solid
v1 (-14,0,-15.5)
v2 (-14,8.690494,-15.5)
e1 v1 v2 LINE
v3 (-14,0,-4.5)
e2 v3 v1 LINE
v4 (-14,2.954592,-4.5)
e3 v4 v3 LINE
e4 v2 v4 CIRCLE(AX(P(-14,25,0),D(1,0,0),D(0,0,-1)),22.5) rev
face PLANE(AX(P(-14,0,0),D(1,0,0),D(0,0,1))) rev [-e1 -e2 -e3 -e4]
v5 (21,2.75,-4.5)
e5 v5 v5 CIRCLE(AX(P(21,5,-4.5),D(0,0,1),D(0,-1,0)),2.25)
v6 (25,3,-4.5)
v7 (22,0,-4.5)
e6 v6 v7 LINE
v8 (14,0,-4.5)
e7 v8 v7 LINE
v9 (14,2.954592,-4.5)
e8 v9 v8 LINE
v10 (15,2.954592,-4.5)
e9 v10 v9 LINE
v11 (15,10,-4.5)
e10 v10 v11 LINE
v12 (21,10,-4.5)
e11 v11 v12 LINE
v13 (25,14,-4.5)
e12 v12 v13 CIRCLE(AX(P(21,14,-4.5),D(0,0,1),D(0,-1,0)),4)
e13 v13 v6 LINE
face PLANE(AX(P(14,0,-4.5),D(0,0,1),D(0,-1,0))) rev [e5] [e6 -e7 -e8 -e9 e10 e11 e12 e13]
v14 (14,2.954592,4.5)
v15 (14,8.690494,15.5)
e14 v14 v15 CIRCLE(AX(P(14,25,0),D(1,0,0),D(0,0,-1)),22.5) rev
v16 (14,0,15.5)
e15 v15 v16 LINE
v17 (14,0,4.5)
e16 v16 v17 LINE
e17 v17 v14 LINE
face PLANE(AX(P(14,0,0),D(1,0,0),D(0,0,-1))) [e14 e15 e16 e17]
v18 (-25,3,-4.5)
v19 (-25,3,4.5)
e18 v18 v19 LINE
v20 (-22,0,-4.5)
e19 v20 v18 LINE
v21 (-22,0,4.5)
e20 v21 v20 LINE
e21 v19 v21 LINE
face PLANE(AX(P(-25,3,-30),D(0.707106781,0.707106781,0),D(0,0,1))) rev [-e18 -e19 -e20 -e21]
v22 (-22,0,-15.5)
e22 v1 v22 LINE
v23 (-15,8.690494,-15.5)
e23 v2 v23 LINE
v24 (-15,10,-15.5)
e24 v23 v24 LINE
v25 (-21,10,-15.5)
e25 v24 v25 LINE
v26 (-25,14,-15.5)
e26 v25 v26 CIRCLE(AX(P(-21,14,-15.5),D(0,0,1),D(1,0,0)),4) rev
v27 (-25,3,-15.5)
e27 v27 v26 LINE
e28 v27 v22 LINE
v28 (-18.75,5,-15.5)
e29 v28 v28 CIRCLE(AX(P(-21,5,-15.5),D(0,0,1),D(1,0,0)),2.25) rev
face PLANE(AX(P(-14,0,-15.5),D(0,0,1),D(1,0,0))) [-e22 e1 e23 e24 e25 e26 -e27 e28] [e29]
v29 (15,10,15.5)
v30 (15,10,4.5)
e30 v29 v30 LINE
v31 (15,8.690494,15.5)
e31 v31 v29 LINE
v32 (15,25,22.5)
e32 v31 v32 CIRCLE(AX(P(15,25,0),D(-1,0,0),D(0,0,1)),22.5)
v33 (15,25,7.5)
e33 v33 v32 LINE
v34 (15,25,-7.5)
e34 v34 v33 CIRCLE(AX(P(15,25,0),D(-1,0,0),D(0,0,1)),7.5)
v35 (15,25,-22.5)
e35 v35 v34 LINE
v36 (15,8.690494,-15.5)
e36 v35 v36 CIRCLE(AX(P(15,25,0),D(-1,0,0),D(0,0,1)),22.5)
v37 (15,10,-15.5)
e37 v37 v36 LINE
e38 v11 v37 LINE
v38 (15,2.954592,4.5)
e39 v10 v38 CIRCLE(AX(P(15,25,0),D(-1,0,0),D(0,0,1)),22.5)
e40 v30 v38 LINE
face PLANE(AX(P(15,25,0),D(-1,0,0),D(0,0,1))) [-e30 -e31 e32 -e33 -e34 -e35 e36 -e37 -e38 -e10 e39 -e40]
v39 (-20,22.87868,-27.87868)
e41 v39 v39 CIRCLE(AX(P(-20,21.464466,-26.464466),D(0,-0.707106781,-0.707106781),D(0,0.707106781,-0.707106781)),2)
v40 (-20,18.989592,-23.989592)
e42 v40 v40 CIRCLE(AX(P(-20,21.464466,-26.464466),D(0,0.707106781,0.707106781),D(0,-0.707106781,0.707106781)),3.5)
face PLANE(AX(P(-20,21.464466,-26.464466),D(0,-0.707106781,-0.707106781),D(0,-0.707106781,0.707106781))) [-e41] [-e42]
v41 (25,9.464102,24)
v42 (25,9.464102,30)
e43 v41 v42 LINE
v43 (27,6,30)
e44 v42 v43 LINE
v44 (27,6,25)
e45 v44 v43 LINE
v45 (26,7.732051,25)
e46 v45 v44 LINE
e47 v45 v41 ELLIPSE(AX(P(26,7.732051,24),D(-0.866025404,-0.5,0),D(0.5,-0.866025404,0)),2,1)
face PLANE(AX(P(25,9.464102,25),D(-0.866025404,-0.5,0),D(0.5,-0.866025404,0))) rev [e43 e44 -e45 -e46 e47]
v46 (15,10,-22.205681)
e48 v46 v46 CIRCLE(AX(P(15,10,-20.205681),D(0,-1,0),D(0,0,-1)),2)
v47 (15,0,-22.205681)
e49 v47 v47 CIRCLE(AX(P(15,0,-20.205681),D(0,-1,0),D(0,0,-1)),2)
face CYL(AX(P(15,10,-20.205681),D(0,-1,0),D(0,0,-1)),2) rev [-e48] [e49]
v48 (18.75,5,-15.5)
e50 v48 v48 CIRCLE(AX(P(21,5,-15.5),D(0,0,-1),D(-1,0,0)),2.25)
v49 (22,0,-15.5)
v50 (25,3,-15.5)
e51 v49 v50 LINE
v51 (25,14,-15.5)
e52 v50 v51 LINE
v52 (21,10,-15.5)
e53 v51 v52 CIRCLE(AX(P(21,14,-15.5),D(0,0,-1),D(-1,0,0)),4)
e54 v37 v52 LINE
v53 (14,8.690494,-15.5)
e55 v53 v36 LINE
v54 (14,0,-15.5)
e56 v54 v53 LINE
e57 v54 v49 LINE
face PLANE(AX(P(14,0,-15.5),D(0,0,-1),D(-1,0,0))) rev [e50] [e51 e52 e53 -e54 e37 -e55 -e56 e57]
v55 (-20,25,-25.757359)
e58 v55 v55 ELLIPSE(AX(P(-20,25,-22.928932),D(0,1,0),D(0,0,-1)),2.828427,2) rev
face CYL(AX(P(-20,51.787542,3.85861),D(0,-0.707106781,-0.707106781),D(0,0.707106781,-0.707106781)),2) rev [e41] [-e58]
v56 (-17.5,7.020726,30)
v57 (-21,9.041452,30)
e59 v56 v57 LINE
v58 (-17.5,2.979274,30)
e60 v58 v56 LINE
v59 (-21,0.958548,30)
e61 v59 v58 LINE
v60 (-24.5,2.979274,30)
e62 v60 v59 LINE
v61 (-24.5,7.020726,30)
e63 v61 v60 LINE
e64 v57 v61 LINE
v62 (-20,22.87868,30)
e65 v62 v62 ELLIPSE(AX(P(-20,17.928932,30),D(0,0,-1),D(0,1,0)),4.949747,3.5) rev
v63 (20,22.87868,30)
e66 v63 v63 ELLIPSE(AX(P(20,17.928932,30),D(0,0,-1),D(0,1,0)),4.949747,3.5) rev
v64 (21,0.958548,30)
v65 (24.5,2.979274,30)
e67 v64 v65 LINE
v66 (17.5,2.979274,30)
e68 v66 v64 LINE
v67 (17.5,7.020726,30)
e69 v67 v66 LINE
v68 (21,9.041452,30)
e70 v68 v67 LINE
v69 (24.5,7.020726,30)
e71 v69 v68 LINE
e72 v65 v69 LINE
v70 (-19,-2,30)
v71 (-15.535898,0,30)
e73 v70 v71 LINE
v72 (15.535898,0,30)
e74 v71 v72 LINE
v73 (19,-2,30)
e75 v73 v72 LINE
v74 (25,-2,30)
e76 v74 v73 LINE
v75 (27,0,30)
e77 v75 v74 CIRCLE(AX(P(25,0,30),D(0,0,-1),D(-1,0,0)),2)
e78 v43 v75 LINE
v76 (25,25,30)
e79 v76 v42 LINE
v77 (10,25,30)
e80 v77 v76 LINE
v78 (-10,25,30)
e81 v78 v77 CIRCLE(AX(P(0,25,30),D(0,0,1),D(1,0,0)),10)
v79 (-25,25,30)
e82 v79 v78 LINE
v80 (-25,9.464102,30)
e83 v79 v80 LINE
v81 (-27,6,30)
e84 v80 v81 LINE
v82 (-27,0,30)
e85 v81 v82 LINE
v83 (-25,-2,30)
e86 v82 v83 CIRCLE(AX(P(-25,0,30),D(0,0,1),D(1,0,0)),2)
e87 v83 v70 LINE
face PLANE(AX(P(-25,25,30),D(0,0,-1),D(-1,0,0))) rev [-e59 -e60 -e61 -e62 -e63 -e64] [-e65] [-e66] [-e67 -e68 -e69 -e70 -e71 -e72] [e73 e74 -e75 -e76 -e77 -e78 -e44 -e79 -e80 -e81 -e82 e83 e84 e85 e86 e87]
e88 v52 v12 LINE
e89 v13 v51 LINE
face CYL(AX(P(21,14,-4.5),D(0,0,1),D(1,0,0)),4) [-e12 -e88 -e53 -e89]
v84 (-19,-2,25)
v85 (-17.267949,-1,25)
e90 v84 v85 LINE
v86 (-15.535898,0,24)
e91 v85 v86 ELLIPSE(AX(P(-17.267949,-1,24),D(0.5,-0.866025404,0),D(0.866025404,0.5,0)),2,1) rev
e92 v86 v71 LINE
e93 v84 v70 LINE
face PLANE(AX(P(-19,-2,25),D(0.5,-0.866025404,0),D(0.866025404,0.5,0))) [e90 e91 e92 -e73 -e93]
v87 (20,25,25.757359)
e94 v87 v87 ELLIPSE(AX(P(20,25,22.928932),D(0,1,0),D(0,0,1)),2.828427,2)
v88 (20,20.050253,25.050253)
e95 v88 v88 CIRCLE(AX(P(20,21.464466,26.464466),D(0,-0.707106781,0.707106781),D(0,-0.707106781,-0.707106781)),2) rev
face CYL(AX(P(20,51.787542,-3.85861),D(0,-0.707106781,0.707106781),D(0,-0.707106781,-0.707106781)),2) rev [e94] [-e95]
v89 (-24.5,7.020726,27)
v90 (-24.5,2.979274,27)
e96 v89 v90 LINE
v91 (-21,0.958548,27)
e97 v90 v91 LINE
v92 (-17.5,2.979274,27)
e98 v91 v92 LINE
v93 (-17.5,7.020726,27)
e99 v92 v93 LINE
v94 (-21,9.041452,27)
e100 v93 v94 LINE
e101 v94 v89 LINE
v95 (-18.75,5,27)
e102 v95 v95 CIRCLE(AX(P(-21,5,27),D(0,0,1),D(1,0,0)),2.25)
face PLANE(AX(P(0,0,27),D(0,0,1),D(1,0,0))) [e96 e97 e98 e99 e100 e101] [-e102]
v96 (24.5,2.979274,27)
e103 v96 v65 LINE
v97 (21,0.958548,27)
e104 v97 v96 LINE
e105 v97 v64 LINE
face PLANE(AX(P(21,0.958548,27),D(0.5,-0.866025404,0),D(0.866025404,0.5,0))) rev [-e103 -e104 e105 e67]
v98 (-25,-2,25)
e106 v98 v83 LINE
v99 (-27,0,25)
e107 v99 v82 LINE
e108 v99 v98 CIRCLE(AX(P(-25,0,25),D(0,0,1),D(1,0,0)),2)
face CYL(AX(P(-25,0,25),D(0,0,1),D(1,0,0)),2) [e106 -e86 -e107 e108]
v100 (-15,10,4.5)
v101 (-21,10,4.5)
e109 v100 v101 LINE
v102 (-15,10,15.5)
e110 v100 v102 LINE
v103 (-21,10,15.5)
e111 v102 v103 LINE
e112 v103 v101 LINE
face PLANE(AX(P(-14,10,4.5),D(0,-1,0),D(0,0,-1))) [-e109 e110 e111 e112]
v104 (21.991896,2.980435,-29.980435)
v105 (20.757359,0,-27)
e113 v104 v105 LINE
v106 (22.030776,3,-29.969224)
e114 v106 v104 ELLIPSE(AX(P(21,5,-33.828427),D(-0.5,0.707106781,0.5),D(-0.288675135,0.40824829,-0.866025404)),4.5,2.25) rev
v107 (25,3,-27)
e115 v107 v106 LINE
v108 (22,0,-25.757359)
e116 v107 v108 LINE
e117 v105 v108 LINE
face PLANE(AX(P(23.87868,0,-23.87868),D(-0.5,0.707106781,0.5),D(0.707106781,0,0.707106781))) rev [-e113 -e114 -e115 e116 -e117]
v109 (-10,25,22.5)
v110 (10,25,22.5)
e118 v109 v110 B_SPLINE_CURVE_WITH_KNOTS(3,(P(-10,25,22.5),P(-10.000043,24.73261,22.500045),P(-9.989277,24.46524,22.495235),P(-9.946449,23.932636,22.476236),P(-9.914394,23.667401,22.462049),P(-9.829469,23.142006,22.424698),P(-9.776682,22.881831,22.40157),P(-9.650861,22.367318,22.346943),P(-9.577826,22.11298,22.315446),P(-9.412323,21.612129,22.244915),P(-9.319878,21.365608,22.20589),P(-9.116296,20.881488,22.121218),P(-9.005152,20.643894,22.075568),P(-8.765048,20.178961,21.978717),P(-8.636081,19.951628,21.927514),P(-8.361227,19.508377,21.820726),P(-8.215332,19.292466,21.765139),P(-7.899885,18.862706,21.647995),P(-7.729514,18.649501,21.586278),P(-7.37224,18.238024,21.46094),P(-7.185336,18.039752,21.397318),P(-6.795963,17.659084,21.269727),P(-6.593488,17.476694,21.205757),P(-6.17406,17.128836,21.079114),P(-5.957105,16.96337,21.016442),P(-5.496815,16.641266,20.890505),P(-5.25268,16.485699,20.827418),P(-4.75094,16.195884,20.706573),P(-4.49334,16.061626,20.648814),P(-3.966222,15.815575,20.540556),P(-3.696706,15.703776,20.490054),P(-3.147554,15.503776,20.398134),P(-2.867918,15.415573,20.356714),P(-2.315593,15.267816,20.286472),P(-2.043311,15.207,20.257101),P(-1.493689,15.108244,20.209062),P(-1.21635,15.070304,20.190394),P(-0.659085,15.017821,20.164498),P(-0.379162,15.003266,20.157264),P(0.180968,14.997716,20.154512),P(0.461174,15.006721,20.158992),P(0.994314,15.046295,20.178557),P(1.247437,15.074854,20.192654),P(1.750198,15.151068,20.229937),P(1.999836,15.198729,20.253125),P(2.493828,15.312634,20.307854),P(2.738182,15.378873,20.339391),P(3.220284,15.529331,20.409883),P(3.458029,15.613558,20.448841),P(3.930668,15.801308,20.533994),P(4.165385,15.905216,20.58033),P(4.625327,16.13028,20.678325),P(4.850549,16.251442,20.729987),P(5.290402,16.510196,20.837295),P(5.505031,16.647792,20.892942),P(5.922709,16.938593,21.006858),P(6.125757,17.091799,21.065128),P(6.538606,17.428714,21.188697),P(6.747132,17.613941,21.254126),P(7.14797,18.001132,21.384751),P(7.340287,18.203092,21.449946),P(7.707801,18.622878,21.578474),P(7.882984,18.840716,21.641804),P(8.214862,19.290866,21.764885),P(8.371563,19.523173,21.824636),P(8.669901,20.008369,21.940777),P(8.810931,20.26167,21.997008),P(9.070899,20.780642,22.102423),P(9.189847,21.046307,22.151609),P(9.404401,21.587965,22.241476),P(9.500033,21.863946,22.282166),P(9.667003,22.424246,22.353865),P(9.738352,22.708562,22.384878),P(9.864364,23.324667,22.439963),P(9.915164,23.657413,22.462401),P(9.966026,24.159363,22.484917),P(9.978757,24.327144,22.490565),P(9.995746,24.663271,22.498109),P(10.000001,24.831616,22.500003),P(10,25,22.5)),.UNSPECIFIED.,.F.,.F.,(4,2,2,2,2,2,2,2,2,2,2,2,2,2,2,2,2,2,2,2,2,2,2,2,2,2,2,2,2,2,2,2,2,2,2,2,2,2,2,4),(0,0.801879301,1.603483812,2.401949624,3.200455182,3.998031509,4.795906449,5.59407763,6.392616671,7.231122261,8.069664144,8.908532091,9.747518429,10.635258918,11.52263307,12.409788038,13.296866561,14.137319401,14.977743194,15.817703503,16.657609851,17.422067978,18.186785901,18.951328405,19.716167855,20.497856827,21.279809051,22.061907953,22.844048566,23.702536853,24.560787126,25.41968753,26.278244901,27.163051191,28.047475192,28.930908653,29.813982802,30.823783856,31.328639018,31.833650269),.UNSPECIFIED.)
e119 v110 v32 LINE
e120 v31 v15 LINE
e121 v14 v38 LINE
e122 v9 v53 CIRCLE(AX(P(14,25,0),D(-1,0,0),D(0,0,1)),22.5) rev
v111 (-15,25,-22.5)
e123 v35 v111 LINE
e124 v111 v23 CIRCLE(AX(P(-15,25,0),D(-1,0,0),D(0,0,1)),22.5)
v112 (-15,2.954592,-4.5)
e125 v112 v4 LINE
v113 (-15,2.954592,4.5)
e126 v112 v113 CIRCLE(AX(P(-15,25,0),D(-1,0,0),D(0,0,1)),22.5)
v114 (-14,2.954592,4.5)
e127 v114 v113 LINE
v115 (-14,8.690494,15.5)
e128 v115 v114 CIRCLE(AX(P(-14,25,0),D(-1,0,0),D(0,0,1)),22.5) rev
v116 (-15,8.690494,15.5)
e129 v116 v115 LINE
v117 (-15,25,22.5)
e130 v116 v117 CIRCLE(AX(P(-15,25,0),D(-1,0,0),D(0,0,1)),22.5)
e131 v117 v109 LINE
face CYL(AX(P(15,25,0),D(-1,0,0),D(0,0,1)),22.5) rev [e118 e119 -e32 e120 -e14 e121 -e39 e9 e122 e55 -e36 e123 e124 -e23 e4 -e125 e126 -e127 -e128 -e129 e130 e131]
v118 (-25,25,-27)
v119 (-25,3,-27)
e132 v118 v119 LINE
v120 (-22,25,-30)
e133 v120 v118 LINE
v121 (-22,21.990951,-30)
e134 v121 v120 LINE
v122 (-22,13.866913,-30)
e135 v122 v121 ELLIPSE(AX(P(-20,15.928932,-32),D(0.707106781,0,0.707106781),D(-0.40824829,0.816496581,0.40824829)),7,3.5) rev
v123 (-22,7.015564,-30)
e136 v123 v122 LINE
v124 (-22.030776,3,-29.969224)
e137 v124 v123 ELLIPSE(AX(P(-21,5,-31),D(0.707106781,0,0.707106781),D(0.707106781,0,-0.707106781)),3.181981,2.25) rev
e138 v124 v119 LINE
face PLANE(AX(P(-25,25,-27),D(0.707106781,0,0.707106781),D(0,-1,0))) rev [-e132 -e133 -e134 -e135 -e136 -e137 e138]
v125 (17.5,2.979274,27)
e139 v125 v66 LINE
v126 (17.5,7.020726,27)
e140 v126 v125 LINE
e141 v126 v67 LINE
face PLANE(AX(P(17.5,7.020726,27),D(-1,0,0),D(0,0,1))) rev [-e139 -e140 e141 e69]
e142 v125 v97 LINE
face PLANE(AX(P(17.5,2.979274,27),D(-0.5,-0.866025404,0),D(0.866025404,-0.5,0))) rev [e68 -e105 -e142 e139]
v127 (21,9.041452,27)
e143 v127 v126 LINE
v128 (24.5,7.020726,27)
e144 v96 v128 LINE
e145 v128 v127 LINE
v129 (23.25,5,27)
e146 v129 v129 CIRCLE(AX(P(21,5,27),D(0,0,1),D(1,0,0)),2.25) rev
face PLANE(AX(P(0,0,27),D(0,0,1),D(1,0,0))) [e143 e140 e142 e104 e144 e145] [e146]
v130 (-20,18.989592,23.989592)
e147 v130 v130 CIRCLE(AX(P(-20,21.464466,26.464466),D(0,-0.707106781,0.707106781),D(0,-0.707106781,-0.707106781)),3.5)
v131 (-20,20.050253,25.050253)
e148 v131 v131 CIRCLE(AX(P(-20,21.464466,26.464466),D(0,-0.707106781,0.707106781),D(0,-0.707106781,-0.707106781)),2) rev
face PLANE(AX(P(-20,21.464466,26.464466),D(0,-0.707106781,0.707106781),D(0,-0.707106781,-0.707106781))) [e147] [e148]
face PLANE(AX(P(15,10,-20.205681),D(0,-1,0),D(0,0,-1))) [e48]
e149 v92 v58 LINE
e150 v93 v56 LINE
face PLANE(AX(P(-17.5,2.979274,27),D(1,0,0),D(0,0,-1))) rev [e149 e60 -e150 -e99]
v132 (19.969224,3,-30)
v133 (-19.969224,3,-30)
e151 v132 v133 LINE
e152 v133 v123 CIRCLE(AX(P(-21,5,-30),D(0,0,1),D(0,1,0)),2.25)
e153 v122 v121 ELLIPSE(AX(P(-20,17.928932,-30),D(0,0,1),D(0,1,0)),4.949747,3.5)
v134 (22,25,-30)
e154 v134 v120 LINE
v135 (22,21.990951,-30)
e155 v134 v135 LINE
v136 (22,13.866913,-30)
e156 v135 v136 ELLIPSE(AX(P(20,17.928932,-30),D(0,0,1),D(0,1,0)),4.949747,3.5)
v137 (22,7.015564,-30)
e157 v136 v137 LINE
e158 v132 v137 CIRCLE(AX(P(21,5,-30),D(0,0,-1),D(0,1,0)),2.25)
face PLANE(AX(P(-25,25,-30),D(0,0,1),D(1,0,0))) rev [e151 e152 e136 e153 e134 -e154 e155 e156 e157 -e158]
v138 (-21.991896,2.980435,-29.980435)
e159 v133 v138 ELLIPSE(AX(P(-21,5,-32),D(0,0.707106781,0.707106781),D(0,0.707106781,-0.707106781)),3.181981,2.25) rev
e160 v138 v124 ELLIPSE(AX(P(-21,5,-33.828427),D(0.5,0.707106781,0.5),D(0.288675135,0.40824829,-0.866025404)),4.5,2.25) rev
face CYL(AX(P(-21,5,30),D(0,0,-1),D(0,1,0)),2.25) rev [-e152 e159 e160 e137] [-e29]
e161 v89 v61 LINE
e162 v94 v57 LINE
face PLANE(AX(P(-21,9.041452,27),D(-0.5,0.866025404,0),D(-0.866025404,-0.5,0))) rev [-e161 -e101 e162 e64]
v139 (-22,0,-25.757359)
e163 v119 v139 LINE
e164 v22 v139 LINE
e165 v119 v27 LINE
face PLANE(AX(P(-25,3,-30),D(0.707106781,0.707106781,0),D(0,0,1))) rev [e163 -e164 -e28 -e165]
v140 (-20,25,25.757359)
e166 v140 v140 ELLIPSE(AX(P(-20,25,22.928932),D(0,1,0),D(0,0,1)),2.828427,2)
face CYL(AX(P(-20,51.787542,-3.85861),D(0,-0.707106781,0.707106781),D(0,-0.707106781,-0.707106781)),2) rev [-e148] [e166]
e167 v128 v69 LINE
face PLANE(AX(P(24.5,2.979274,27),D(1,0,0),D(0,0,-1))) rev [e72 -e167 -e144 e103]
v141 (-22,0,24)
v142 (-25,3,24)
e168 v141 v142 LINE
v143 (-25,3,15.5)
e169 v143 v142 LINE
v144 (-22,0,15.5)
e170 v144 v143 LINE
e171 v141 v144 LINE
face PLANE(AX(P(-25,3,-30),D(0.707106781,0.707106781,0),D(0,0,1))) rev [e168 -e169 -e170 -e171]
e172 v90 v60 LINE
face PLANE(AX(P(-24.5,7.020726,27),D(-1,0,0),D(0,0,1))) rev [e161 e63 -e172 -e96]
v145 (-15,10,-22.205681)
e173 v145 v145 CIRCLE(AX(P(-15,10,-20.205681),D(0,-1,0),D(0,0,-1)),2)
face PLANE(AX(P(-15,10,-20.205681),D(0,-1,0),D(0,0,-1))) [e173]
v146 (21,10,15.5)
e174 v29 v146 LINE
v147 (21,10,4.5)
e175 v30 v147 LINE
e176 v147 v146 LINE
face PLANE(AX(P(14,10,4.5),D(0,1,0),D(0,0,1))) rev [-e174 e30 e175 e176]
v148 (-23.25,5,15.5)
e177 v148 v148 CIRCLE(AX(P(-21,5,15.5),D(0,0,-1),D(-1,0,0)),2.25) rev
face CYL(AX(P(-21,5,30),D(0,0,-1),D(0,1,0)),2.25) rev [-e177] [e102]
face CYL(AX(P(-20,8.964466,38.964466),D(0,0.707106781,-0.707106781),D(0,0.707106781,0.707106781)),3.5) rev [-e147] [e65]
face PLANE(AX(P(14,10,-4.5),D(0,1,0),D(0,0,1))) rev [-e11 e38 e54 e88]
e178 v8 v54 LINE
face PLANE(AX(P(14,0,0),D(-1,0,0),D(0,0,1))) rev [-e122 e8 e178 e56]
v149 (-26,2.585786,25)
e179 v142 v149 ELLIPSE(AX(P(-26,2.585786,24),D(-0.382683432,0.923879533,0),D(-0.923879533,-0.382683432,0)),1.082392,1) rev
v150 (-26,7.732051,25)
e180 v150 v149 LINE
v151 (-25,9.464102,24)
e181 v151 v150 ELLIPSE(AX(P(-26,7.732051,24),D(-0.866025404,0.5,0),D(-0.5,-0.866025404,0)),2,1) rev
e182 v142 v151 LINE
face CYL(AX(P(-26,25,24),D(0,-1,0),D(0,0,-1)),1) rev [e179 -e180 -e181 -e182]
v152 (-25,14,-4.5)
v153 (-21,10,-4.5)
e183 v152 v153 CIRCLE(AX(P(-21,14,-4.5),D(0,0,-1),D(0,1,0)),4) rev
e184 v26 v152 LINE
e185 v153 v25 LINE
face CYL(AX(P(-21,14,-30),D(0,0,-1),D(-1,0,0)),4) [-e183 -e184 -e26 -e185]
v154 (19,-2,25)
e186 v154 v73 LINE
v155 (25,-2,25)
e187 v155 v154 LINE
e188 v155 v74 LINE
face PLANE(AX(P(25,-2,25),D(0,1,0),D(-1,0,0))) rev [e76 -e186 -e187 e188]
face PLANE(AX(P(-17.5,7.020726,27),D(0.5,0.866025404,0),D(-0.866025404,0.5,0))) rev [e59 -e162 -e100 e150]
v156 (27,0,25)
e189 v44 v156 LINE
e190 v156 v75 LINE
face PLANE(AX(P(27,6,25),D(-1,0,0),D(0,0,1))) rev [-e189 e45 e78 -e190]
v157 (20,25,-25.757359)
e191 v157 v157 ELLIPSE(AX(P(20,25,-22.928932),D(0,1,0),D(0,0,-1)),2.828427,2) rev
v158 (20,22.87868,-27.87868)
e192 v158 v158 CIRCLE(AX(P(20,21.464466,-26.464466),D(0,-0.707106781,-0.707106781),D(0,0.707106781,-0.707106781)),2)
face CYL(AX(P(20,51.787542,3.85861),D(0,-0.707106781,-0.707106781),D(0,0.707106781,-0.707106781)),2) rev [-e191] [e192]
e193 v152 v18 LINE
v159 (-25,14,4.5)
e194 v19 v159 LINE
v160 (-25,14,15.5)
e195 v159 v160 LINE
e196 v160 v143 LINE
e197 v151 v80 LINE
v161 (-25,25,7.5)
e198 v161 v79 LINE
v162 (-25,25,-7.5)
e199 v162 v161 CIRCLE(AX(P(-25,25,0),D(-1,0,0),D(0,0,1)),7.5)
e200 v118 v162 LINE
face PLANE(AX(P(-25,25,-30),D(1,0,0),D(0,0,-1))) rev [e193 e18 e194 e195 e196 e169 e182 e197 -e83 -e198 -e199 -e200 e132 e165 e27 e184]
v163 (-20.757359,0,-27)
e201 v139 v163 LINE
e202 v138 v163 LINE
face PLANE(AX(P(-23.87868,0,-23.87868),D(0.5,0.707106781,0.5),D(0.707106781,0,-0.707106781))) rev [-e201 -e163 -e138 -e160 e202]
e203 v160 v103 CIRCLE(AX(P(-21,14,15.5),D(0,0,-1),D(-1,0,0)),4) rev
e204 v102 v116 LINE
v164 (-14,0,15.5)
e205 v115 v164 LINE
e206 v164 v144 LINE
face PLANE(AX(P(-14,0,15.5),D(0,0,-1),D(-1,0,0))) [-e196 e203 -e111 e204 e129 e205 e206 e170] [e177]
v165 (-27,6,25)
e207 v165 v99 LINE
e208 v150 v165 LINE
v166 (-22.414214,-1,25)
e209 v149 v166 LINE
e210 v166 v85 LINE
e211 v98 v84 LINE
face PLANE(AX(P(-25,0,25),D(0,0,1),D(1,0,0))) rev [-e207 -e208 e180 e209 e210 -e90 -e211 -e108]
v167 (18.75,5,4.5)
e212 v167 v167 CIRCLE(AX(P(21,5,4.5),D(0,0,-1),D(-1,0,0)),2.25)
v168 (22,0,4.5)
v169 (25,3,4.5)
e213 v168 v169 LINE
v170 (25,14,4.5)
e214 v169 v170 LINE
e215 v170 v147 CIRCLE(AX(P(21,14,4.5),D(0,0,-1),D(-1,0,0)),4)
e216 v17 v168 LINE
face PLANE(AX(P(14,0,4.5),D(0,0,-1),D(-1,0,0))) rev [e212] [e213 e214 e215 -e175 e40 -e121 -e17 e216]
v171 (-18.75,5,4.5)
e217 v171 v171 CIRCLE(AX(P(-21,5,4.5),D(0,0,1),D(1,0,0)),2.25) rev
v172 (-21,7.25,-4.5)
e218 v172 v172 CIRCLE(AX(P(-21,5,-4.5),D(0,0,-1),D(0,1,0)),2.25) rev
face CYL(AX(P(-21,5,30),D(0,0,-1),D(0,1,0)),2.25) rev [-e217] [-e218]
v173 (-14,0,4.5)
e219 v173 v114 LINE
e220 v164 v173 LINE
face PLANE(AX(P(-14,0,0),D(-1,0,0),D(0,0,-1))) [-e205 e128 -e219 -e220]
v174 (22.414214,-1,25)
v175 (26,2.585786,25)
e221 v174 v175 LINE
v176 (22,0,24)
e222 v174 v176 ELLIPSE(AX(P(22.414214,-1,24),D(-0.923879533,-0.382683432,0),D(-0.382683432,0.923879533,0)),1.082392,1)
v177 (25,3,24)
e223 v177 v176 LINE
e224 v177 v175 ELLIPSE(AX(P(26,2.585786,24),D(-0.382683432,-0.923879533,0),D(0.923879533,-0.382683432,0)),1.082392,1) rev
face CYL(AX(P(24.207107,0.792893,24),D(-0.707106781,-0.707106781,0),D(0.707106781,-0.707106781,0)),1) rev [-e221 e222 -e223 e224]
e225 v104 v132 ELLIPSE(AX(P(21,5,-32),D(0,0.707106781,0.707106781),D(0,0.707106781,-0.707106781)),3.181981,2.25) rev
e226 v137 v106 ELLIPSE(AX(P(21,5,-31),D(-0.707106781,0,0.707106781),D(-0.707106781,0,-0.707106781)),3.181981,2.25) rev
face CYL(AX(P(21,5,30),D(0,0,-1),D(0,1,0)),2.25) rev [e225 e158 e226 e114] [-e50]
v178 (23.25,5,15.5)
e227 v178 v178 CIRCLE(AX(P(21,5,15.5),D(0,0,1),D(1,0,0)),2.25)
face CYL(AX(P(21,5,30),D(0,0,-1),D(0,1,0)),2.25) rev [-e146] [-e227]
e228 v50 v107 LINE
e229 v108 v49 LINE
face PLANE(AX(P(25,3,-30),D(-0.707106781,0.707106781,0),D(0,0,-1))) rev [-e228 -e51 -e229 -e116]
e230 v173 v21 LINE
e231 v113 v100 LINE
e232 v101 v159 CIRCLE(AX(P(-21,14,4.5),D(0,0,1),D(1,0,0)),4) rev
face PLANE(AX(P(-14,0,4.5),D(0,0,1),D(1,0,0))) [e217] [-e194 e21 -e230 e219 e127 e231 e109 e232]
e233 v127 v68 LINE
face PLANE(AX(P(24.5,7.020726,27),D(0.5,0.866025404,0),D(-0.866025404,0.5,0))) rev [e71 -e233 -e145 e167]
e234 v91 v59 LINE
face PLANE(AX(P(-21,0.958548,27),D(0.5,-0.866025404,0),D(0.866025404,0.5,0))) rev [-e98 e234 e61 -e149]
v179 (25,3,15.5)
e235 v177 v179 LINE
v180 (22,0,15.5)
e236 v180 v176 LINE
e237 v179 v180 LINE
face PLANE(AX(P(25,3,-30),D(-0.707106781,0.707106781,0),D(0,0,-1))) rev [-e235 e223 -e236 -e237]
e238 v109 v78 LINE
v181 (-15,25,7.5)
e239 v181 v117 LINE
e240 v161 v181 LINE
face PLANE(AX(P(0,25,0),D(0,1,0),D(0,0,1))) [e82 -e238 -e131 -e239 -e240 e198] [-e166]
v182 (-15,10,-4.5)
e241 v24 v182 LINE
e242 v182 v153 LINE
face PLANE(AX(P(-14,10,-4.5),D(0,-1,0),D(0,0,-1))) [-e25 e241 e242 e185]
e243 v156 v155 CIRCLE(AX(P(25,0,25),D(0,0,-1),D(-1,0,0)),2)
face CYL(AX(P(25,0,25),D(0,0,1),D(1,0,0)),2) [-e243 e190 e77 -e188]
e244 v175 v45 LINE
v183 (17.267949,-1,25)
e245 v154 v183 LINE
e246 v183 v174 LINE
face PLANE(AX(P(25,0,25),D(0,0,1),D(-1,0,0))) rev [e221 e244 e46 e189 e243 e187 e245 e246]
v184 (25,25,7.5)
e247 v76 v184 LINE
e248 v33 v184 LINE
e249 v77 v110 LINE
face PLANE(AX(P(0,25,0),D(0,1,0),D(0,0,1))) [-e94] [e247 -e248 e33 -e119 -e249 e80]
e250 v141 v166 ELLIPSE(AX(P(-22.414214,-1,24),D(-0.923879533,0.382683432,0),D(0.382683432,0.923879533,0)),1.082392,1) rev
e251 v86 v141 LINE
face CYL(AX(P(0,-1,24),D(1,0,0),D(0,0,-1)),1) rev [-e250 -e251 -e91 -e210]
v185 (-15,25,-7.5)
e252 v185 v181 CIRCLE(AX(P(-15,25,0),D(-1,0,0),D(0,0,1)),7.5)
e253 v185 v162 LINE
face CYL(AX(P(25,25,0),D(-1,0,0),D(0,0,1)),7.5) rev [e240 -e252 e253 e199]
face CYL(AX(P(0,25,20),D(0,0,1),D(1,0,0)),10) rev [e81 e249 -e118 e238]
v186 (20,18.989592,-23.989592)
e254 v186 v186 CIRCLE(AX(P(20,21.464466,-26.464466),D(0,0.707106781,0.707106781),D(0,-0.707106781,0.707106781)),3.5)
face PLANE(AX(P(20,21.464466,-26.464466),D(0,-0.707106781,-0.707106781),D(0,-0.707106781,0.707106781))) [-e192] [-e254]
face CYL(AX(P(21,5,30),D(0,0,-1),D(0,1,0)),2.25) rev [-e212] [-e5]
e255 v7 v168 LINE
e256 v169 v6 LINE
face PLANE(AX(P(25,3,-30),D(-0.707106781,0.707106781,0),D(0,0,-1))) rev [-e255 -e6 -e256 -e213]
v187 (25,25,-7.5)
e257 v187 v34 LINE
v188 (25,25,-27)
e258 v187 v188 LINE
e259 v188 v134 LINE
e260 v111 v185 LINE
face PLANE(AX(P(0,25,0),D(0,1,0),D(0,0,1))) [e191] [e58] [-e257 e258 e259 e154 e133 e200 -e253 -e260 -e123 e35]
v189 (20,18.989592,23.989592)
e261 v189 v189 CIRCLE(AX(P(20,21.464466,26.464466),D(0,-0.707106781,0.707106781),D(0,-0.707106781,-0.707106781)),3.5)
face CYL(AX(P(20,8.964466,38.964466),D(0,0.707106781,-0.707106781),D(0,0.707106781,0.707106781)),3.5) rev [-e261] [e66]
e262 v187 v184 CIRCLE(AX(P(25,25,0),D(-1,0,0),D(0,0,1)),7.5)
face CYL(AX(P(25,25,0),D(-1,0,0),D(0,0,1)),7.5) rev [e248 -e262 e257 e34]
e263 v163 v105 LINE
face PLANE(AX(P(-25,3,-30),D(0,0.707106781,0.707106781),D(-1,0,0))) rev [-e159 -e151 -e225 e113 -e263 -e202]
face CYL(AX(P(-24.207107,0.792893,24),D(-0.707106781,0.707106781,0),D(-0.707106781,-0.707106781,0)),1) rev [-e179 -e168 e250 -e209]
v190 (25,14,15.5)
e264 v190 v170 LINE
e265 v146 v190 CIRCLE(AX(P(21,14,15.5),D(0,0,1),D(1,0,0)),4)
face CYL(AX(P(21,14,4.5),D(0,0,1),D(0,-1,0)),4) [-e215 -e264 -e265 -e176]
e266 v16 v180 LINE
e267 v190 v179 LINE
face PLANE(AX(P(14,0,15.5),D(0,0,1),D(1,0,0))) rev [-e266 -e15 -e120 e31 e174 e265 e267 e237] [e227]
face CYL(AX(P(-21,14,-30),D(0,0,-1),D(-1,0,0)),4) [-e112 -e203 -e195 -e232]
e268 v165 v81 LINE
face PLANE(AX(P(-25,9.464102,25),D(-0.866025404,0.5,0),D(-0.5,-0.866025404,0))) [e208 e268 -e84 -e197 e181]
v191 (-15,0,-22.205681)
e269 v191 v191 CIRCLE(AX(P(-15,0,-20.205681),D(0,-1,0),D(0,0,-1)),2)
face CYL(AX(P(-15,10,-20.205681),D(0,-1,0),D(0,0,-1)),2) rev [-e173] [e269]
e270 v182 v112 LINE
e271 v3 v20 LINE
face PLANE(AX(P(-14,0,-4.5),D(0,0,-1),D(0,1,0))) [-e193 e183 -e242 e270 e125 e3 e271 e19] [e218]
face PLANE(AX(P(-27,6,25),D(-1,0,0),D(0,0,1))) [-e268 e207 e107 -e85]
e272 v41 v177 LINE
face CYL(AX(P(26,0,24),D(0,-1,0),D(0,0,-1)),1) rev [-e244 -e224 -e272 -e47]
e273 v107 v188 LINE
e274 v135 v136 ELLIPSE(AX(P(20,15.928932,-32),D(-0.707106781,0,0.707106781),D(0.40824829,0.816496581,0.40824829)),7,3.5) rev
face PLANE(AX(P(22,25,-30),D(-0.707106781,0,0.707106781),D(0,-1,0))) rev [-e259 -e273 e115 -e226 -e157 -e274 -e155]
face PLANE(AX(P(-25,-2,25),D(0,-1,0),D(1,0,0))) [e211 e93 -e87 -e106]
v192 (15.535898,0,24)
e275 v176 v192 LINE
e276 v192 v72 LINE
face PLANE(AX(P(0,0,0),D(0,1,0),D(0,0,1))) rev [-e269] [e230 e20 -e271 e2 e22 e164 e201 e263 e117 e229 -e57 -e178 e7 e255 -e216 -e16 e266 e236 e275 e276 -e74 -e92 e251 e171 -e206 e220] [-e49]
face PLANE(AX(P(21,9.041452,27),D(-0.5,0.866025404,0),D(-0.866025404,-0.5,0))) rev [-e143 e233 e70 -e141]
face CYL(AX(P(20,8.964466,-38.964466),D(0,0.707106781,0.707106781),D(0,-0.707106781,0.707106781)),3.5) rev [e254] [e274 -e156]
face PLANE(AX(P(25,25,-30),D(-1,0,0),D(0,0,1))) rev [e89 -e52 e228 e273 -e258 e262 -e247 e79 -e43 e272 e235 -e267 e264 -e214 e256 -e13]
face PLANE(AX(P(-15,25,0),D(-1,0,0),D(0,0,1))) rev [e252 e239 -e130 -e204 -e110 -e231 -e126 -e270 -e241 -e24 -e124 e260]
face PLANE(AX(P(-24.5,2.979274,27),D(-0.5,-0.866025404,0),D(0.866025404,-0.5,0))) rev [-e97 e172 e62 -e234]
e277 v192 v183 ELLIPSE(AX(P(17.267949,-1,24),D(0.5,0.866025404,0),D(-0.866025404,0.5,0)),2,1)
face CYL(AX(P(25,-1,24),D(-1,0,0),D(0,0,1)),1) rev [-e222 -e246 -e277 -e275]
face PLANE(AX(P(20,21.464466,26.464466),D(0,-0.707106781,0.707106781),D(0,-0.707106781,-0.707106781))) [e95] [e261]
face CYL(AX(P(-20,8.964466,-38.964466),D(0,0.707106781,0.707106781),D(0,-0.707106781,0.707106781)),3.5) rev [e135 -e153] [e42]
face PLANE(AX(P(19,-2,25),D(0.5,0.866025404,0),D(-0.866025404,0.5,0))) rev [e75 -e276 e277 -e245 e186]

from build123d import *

# Parameters (mm, degrees)
SKETCH1_W           = 50
SKETCH1_H           = 60
BOSS_EXTRUDE1_DEPTH = 25
CUT_EXTRUDE1_START  = -10
SKETCH2_R           = 22.5
CUT_EXTRUDE1_DEPTH  = 30
SKETCH3_R           = 7.5
CUT_EXTRUDE2_DEPTH  = 64.442887702
SKETCH4_R           = 10
CUT_EXTRUDE3_DEPTH  = 10
SKETCH10_W          = 11
SKETCH10_H          = 10
CUT_EXTRUDE9_DEPTH  = 11
SKETCH11_R          = 2.25
CUT_EXTRUDE10_DEPTH = 50.398886748
SKETCH12_R          = 2
CUT_EXTRUDE11_DEPTH = 50.371044201
SKETCH13_R          = 3.5
CUT_EXTRUDE12_DEPTH = 50.371044201
CHAMFER1_SIZE       = 3
FILLET1_R           = 4
SKETCH14_R          = 2
CUT_EXTRUDE13_DEPTH = 10
CUT_EXTRUDE14_DEPTH = 3
BOSS_EXTRUDE2_DEPTH = 5
CHAMFER2_SIZE       = 3
FILLET2_R           = 1


with BuildPart() as part:
    # Sketch1 → Boss-Extrude1 (new body)
    with BuildSketch(Plane(origin=(0, 0, 0), x_dir=(1, 0, 0), z_dir=(0, 1, 0))):
        Rectangle(SKETCH1_W, SKETCH1_H)
    extrude(amount=BOSS_EXTRUDE1_DEPTH)

    # Sketch2 → Cut-Extrude1 (cut)
    with BuildSketch(Plane.ZY.offset(25).offset(CUT_EXTRUDE1_START)):
        with Locations((0, 25)):
            Circle(SKETCH2_R)
    extrude(amount=-CUT_EXTRUDE1_DEPTH, mode=Mode.SUBTRACT)

    # Sketch3 → Cut-Extrude2 (cut, through all)
    with BuildSketch(Plane.ZY.offset(25)):
        with Locations((0, 25)):
            Circle(SKETCH3_R)
    extrude(amount=-CUT_EXTRUDE2_DEPTH, mode=Mode.SUBTRACT)

    # Sketch4 → Cut-Extrude3 (cut)
    with BuildSketch(Plane.XY.offset(30)):
        with Locations((0, 25)):
            Circle(SKETCH4_R)
    extrude(amount=-CUT_EXTRUDE3_DEPTH, mode=Mode.SUBTRACT)

    # Sketch10 → Cut-Extrude9 (cut)
    with BuildSketch(Plane(origin=(25, 0, 0), x_dir=(0, 0, -1), z_dir=(1, 0, 0))):
        with Locations((-10, 5)):
            Rectangle(SKETCH10_W, SKETCH10_H)
        with Locations((10, 5)):
            Rectangle(SKETCH10_W, SKETCH10_H)
    cut_extrude9 = extrude(amount=-CUT_EXTRUDE9_DEPTH, mode=Mode.SUBTRACT)

    # Sketch11 → Cut-Extrude10 (cut, symmetric)
    with BuildSketch(Plane(origin=(0, 0, -4.5), x_dir=(-1, 0, 0), z_dir=(0, 0, -1))):
        with Locations(Location((-21, 5, 0), (0, 0, 90))):
            Circle(SKETCH11_R)
    cut_extrude10 = extrude(amount=CUT_EXTRUDE10_DEPTH, both=True, mode=Mode.SUBTRACT)

    # Mirror1: Cut-Extrude9, Cut-Extrude10 across plane
    add(cut_extrude9.mirror(Plane(origin=(0, 0, 0), x_dir=(0, 0, 1), z_dir=(1, 0, 0))), mode=Mode.SUBTRACT)
    add(cut_extrude10.mirror(Plane(origin=(0, 0, 0), x_dir=(0, 0, 1), z_dir=(1, 0, 0))), mode=Mode.SUBTRACT)

    # Sketch12 → Cut-Extrude11 (cut, symmetric)
    with BuildSketch(Plane(origin=(0, -2.5, 2.5), x_dir=(1, 0, 0), z_dir=(0, -0.7071067811865475, 0.7071067811865477))):
        with Locations(Location((20, 33.890872965, 0), (0, 0, 270))):
            Circle(SKETCH12_R)
        with Locations(Location((-20, 33.890872965, 0), (0, 0, 270))):
            Circle(SKETCH12_R)
    cut_extrude11 = extrude(amount=CUT_EXTRUDE11_DEPTH, both=True, mode=Mode.SUBTRACT)

    # Sketch13 → Cut-Extrude12 (cut, through all)
    with BuildSketch(Plane(origin=(0, -2.5, 2.5), x_dir=(1, 0, 0), z_dir=(0, -0.7071067811865475, 0.7071067811865477))):
        with Locations(Location((-20, 33.890872965, 0), (0, 0, 90))):
            Circle(SKETCH13_R)
        with Locations(Location((20, 33.890872965, 0), (0, 0, 90))):
            Circle(SKETCH13_R)
    cut_extrude12 = extrude(amount=CUT_EXTRUDE12_DEPTH, mode=Mode.SUBTRACT)

    # Mirror3: Cut-Extrude11, Cut-Extrude12 across plane
    add(cut_extrude11.mirror(Plane.XY), mode=Mode.SUBTRACT)
    add(cut_extrude12.mirror(Plane.XY), mode=Mode.SUBTRACT)

    # Chamfer1
    # the kernel refuses this chamfer: 3 mm, written as the material it takes off along each edge
    with BuildSketch(Plane(origin=(25, -7.715048964, -30), x_dir=(-0.9996219169112965, 0, -0.02749587661058676), z_dir=(0, 1, 0))) as chamfer1_piece_1:
        Polygon((CHAMFER1_SIZE * 0.999621916911, CHAMFER1_SIZE * 0.0274958766106), (-CHAMFER1_SIZE * 0.0274958766106, CHAMFER1_SIZE * 0.999621916911), (0, 0), align=None)
    extrude(amount=40.430097928, mode=Mode.SUBTRACT)
    with BuildSketch(Plane(origin=(-25, -7.715048964, -30), x_dir=(0.9996219169112965, 0, -0.02749587661058676), z_dir=(0, 1, 0))) as chamfer1_piece_2:
        Polygon((CHAMFER1_SIZE * 0.999621916911, -CHAMFER1_SIZE * 0.0274958766106), (-CHAMFER1_SIZE * 0.0274958766106, -CHAMFER1_SIZE * 0.999621916911), (0, 0), align=None)
    extrude(amount=40.430097928, mode=Mode.SUBTRACT)

    # Fillet1
    fillet1_edges = [part.edges().sort_by_distance(p)[0] for p in [
        (-25, 10, 10),
        (-25, 10, -10),
        (25, 10, 10),
        (25, 10, -10),
    ]]
    fillet(fillet1_edges, radius=FILLET1_R)

    # Sketch14 → Cut-Extrude13 (cut)
    with BuildSketch(Plane.XZ):
        with Locations(Location((-15, -20.205680561, 0), (0, 0, 270))):
            Circle(SKETCH14_R)
        with Locations(Location((15, -20.205680561, 0), (0, 0, 270))):
            Circle(SKETCH14_R)
    extrude(amount=-CUT_EXTRUDE13_DEPTH, mode=Mode.SUBTRACT)

    # Sketch15 → Cut-Extrude14 (cut)
    with BuildSketch(Plane.XY.offset(30)):
        Polygon((-21, 0.958548116), (-17.5, 2.979274058), (-17.5, 7.020725942), (-21, 9.041451884), (-24.5, 7.020725942), (-24.5, 2.979274058), align=None)
        Polygon((21, 0.958548116), (24.5, 2.979274058), (24.5, 7.020725942), (21, 9.041451884), (17.5, 7.020725942), (17.5, 2.979274058), align=None)
    extrude(amount=-CUT_EXTRUDE14_DEPTH, mode=Mode.SUBTRACT)

    # Sketch16 → Boss-Extrude2 (add)
    with BuildSketch(Plane.XY.offset(30)):
        with BuildLine():
            Line((-25, 9.464101615), (-27, 6))
            Line((-27, 6), (-27, 0))
            ThreePointArc((-27, 0), (-26.414213562, -1.414213562), (-25, -2))
            Line((-25, -2), (-19, -2))
            Line((-19, -2), (-15.535898385, 0))
            Line((-15.535898385, 0), (-25, 0))
            Line((-25, 0), (-25, 9.464101615))
        make_face()
    boss_extrude2 = extrude(amount=-BOSS_EXTRUDE2_DEPTH)

    # Mirror4: Boss-Extrude2 across plane
    add(boss_extrude2.mirror(Plane(origin=(0, 0, 0), x_dir=(0, 0, 1), z_dir=(1, 0, 0))))

    # Chamfer2
    # the kernel refuses this chamfer: 3 mm, written as the material it takes off along each edge
    with BuildSketch(Plane(origin=(-25, 0, 25), x_dir=(0.9996219169112968, -0.02749587661058636, 0), z_dir=(0, 0, -1))) as chamfer2_piece_1:
        Polygon((CHAMFER2_SIZE * 0.999621916911, -CHAMFER2_SIZE * 0.0274958766106), (-CHAMFER2_SIZE * 0.0274958766106, -CHAMFER2_SIZE * 0.999621916911), (0, 0), align=None)
    extrude(amount=17.215048964, mode=Mode.SUBTRACT)
    with BuildSketch(Plane(origin=(-25, 0, 12.215048964), x_dir=(0.9996219169112968, -0.02749587661058636, 0), z_dir=(0, 0, -1))) as chamfer2_piece_2:
        Polygon((CHAMFER2_SIZE * 0.999621916911, -CHAMFER2_SIZE * 0.0274958766106), (-CHAMFER2_SIZE * 0.0274958766106, -CHAMFER2_SIZE * 0.999621916911), (0, 0), align=None)
    extrude(amount=24.430097928, mode=Mode.SUBTRACT)
    with BuildSketch(Plane(origin=(-25, 0, -7.784951036), x_dir=(0.9996219169112968, -0.02749587661058636, 0), z_dir=(0, 0, -1))) as chamfer2_piece_3:
        Polygon((CHAMFER2_SIZE * 0.999621916911, -CHAMFER2_SIZE * 0.0274958766106), (-CHAMFER2_SIZE * 0.0274958766106, -CHAMFER2_SIZE * 0.999621916911), (0, 0), align=None)
    extrude(amount=26.930097928, mode=Mode.SUBTRACT)
    with BuildSketch(Plane(origin=(-16.54463656, 0, -35.45536344), x_dir=(0.7068394360709561, -0.027495876610586396, 0.7068394360703909), z_dir=(-0.7071067811862648, 0, 0.7071067811868302))) as chamfer2_piece_4:
        Polygon((CHAMFER2_SIZE * 0.999621916911, CHAMFER2_SIZE * 0.0274958766106), (-CHAMFER2_SIZE * 0.0274958766106, CHAMFER2_SIZE * 0.999621916911), (0, 0), align=None)
    extrude(amount=19.672738615, mode=Mode.SUBTRACT)
    with BuildSketch(Plane(origin=(-29.715048964, 0, -30), x_dir=(0, -0.02749587661058636, 0.9996219169112968), z_dir=(1, 0, 0))) as chamfer2_piece_5:
        Polygon((CHAMFER2_SIZE * 0.999621916911, -CHAMFER2_SIZE * 0.0274958766106), (-CHAMFER2_SIZE * 0.0274958766106, -CHAMFER2_SIZE * 0.999621916911), (0, 0), align=None)
    extrude(amount=59.430097928, mode=Mode.SUBTRACT)
    with BuildSketch(Plane(origin=(16.54463656, 0, -35.45536344), x_dir=(-0.7068394360709561, -0.027495876610586396, 0.7068394360703909), z_dir=(0.7071067811862648, 0, 0.7071067811868302))) as chamfer2_piece_6:
        Polygon((CHAMFER2_SIZE * 0.999621916911, -CHAMFER2_SIZE * 0.0274958766106), (-CHAMFER2_SIZE * 0.0274958766106, -CHAMFER2_SIZE * 0.999621916911), (0, 0), align=None)
    extrude(amount=19.672738615, mode=Mode.SUBTRACT)
    with BuildSketch(Plane(origin=(25, 0, -34.715048964), x_dir=(0.027495876610586778, 0.9996219169112968, 0), z_dir=(0, 0, 1))) as chamfer2_piece_7:
        Polygon((CHAMFER2_SIZE * 0.999621916911, CHAMFER2_SIZE * 0.0274958766106), (-CHAMFER2_SIZE * 0.0274958766106, CHAMFER2_SIZE * 0.999621916911), (0, 0), align=None)
    extrude(amount=26.930097928, mode=Mode.SUBTRACT)
    with BuildSketch(Plane(origin=(25, 0, 7.784951036), x_dir=(0.027495876610586778, 0.9996219169112968, 0), z_dir=(0, 0, 1))) as chamfer2_piece_8:
        Polygon((CHAMFER2_SIZE * 0.999621916911, CHAMFER2_SIZE * 0.0274958766106), (-CHAMFER2_SIZE * 0.0274958766106, CHAMFER2_SIZE * 0.999621916911), (0, 0), align=None)
    extrude(amount=17.215048964, mode=Mode.SUBTRACT)
    with BuildSketch(Plane(origin=(25, 0, -12.215048964), x_dir=(0.027495876610586778, 0.9996219169112968, 0), z_dir=(0, 0, 1))) as chamfer2_piece_9:
        Polygon((CHAMFER2_SIZE * 0.999621916911, CHAMFER2_SIZE * 0.0274958766106), (-CHAMFER2_SIZE * 0.0274958766106, CHAMFER2_SIZE * 0.999621916911), (0, 0), align=None)
    extrude(amount=24.430097928, mode=Mode.SUBTRACT)

    # Fillet2
    fillet2_edges = [part.edges().sort_by_distance(p)[0] for p in [
        (-18.767949192, 0, 25),
        (18.767949192, 0, 25),
        (-25, 6.232050808, 25),
        (25, 6.232050808, 25),
        (-23.5, 1.5, 25),
        (23.5, 1.5, 25),
    ]]
    fillet(fillet2_edges, radius=FILLET2_R)


solid = part.part
